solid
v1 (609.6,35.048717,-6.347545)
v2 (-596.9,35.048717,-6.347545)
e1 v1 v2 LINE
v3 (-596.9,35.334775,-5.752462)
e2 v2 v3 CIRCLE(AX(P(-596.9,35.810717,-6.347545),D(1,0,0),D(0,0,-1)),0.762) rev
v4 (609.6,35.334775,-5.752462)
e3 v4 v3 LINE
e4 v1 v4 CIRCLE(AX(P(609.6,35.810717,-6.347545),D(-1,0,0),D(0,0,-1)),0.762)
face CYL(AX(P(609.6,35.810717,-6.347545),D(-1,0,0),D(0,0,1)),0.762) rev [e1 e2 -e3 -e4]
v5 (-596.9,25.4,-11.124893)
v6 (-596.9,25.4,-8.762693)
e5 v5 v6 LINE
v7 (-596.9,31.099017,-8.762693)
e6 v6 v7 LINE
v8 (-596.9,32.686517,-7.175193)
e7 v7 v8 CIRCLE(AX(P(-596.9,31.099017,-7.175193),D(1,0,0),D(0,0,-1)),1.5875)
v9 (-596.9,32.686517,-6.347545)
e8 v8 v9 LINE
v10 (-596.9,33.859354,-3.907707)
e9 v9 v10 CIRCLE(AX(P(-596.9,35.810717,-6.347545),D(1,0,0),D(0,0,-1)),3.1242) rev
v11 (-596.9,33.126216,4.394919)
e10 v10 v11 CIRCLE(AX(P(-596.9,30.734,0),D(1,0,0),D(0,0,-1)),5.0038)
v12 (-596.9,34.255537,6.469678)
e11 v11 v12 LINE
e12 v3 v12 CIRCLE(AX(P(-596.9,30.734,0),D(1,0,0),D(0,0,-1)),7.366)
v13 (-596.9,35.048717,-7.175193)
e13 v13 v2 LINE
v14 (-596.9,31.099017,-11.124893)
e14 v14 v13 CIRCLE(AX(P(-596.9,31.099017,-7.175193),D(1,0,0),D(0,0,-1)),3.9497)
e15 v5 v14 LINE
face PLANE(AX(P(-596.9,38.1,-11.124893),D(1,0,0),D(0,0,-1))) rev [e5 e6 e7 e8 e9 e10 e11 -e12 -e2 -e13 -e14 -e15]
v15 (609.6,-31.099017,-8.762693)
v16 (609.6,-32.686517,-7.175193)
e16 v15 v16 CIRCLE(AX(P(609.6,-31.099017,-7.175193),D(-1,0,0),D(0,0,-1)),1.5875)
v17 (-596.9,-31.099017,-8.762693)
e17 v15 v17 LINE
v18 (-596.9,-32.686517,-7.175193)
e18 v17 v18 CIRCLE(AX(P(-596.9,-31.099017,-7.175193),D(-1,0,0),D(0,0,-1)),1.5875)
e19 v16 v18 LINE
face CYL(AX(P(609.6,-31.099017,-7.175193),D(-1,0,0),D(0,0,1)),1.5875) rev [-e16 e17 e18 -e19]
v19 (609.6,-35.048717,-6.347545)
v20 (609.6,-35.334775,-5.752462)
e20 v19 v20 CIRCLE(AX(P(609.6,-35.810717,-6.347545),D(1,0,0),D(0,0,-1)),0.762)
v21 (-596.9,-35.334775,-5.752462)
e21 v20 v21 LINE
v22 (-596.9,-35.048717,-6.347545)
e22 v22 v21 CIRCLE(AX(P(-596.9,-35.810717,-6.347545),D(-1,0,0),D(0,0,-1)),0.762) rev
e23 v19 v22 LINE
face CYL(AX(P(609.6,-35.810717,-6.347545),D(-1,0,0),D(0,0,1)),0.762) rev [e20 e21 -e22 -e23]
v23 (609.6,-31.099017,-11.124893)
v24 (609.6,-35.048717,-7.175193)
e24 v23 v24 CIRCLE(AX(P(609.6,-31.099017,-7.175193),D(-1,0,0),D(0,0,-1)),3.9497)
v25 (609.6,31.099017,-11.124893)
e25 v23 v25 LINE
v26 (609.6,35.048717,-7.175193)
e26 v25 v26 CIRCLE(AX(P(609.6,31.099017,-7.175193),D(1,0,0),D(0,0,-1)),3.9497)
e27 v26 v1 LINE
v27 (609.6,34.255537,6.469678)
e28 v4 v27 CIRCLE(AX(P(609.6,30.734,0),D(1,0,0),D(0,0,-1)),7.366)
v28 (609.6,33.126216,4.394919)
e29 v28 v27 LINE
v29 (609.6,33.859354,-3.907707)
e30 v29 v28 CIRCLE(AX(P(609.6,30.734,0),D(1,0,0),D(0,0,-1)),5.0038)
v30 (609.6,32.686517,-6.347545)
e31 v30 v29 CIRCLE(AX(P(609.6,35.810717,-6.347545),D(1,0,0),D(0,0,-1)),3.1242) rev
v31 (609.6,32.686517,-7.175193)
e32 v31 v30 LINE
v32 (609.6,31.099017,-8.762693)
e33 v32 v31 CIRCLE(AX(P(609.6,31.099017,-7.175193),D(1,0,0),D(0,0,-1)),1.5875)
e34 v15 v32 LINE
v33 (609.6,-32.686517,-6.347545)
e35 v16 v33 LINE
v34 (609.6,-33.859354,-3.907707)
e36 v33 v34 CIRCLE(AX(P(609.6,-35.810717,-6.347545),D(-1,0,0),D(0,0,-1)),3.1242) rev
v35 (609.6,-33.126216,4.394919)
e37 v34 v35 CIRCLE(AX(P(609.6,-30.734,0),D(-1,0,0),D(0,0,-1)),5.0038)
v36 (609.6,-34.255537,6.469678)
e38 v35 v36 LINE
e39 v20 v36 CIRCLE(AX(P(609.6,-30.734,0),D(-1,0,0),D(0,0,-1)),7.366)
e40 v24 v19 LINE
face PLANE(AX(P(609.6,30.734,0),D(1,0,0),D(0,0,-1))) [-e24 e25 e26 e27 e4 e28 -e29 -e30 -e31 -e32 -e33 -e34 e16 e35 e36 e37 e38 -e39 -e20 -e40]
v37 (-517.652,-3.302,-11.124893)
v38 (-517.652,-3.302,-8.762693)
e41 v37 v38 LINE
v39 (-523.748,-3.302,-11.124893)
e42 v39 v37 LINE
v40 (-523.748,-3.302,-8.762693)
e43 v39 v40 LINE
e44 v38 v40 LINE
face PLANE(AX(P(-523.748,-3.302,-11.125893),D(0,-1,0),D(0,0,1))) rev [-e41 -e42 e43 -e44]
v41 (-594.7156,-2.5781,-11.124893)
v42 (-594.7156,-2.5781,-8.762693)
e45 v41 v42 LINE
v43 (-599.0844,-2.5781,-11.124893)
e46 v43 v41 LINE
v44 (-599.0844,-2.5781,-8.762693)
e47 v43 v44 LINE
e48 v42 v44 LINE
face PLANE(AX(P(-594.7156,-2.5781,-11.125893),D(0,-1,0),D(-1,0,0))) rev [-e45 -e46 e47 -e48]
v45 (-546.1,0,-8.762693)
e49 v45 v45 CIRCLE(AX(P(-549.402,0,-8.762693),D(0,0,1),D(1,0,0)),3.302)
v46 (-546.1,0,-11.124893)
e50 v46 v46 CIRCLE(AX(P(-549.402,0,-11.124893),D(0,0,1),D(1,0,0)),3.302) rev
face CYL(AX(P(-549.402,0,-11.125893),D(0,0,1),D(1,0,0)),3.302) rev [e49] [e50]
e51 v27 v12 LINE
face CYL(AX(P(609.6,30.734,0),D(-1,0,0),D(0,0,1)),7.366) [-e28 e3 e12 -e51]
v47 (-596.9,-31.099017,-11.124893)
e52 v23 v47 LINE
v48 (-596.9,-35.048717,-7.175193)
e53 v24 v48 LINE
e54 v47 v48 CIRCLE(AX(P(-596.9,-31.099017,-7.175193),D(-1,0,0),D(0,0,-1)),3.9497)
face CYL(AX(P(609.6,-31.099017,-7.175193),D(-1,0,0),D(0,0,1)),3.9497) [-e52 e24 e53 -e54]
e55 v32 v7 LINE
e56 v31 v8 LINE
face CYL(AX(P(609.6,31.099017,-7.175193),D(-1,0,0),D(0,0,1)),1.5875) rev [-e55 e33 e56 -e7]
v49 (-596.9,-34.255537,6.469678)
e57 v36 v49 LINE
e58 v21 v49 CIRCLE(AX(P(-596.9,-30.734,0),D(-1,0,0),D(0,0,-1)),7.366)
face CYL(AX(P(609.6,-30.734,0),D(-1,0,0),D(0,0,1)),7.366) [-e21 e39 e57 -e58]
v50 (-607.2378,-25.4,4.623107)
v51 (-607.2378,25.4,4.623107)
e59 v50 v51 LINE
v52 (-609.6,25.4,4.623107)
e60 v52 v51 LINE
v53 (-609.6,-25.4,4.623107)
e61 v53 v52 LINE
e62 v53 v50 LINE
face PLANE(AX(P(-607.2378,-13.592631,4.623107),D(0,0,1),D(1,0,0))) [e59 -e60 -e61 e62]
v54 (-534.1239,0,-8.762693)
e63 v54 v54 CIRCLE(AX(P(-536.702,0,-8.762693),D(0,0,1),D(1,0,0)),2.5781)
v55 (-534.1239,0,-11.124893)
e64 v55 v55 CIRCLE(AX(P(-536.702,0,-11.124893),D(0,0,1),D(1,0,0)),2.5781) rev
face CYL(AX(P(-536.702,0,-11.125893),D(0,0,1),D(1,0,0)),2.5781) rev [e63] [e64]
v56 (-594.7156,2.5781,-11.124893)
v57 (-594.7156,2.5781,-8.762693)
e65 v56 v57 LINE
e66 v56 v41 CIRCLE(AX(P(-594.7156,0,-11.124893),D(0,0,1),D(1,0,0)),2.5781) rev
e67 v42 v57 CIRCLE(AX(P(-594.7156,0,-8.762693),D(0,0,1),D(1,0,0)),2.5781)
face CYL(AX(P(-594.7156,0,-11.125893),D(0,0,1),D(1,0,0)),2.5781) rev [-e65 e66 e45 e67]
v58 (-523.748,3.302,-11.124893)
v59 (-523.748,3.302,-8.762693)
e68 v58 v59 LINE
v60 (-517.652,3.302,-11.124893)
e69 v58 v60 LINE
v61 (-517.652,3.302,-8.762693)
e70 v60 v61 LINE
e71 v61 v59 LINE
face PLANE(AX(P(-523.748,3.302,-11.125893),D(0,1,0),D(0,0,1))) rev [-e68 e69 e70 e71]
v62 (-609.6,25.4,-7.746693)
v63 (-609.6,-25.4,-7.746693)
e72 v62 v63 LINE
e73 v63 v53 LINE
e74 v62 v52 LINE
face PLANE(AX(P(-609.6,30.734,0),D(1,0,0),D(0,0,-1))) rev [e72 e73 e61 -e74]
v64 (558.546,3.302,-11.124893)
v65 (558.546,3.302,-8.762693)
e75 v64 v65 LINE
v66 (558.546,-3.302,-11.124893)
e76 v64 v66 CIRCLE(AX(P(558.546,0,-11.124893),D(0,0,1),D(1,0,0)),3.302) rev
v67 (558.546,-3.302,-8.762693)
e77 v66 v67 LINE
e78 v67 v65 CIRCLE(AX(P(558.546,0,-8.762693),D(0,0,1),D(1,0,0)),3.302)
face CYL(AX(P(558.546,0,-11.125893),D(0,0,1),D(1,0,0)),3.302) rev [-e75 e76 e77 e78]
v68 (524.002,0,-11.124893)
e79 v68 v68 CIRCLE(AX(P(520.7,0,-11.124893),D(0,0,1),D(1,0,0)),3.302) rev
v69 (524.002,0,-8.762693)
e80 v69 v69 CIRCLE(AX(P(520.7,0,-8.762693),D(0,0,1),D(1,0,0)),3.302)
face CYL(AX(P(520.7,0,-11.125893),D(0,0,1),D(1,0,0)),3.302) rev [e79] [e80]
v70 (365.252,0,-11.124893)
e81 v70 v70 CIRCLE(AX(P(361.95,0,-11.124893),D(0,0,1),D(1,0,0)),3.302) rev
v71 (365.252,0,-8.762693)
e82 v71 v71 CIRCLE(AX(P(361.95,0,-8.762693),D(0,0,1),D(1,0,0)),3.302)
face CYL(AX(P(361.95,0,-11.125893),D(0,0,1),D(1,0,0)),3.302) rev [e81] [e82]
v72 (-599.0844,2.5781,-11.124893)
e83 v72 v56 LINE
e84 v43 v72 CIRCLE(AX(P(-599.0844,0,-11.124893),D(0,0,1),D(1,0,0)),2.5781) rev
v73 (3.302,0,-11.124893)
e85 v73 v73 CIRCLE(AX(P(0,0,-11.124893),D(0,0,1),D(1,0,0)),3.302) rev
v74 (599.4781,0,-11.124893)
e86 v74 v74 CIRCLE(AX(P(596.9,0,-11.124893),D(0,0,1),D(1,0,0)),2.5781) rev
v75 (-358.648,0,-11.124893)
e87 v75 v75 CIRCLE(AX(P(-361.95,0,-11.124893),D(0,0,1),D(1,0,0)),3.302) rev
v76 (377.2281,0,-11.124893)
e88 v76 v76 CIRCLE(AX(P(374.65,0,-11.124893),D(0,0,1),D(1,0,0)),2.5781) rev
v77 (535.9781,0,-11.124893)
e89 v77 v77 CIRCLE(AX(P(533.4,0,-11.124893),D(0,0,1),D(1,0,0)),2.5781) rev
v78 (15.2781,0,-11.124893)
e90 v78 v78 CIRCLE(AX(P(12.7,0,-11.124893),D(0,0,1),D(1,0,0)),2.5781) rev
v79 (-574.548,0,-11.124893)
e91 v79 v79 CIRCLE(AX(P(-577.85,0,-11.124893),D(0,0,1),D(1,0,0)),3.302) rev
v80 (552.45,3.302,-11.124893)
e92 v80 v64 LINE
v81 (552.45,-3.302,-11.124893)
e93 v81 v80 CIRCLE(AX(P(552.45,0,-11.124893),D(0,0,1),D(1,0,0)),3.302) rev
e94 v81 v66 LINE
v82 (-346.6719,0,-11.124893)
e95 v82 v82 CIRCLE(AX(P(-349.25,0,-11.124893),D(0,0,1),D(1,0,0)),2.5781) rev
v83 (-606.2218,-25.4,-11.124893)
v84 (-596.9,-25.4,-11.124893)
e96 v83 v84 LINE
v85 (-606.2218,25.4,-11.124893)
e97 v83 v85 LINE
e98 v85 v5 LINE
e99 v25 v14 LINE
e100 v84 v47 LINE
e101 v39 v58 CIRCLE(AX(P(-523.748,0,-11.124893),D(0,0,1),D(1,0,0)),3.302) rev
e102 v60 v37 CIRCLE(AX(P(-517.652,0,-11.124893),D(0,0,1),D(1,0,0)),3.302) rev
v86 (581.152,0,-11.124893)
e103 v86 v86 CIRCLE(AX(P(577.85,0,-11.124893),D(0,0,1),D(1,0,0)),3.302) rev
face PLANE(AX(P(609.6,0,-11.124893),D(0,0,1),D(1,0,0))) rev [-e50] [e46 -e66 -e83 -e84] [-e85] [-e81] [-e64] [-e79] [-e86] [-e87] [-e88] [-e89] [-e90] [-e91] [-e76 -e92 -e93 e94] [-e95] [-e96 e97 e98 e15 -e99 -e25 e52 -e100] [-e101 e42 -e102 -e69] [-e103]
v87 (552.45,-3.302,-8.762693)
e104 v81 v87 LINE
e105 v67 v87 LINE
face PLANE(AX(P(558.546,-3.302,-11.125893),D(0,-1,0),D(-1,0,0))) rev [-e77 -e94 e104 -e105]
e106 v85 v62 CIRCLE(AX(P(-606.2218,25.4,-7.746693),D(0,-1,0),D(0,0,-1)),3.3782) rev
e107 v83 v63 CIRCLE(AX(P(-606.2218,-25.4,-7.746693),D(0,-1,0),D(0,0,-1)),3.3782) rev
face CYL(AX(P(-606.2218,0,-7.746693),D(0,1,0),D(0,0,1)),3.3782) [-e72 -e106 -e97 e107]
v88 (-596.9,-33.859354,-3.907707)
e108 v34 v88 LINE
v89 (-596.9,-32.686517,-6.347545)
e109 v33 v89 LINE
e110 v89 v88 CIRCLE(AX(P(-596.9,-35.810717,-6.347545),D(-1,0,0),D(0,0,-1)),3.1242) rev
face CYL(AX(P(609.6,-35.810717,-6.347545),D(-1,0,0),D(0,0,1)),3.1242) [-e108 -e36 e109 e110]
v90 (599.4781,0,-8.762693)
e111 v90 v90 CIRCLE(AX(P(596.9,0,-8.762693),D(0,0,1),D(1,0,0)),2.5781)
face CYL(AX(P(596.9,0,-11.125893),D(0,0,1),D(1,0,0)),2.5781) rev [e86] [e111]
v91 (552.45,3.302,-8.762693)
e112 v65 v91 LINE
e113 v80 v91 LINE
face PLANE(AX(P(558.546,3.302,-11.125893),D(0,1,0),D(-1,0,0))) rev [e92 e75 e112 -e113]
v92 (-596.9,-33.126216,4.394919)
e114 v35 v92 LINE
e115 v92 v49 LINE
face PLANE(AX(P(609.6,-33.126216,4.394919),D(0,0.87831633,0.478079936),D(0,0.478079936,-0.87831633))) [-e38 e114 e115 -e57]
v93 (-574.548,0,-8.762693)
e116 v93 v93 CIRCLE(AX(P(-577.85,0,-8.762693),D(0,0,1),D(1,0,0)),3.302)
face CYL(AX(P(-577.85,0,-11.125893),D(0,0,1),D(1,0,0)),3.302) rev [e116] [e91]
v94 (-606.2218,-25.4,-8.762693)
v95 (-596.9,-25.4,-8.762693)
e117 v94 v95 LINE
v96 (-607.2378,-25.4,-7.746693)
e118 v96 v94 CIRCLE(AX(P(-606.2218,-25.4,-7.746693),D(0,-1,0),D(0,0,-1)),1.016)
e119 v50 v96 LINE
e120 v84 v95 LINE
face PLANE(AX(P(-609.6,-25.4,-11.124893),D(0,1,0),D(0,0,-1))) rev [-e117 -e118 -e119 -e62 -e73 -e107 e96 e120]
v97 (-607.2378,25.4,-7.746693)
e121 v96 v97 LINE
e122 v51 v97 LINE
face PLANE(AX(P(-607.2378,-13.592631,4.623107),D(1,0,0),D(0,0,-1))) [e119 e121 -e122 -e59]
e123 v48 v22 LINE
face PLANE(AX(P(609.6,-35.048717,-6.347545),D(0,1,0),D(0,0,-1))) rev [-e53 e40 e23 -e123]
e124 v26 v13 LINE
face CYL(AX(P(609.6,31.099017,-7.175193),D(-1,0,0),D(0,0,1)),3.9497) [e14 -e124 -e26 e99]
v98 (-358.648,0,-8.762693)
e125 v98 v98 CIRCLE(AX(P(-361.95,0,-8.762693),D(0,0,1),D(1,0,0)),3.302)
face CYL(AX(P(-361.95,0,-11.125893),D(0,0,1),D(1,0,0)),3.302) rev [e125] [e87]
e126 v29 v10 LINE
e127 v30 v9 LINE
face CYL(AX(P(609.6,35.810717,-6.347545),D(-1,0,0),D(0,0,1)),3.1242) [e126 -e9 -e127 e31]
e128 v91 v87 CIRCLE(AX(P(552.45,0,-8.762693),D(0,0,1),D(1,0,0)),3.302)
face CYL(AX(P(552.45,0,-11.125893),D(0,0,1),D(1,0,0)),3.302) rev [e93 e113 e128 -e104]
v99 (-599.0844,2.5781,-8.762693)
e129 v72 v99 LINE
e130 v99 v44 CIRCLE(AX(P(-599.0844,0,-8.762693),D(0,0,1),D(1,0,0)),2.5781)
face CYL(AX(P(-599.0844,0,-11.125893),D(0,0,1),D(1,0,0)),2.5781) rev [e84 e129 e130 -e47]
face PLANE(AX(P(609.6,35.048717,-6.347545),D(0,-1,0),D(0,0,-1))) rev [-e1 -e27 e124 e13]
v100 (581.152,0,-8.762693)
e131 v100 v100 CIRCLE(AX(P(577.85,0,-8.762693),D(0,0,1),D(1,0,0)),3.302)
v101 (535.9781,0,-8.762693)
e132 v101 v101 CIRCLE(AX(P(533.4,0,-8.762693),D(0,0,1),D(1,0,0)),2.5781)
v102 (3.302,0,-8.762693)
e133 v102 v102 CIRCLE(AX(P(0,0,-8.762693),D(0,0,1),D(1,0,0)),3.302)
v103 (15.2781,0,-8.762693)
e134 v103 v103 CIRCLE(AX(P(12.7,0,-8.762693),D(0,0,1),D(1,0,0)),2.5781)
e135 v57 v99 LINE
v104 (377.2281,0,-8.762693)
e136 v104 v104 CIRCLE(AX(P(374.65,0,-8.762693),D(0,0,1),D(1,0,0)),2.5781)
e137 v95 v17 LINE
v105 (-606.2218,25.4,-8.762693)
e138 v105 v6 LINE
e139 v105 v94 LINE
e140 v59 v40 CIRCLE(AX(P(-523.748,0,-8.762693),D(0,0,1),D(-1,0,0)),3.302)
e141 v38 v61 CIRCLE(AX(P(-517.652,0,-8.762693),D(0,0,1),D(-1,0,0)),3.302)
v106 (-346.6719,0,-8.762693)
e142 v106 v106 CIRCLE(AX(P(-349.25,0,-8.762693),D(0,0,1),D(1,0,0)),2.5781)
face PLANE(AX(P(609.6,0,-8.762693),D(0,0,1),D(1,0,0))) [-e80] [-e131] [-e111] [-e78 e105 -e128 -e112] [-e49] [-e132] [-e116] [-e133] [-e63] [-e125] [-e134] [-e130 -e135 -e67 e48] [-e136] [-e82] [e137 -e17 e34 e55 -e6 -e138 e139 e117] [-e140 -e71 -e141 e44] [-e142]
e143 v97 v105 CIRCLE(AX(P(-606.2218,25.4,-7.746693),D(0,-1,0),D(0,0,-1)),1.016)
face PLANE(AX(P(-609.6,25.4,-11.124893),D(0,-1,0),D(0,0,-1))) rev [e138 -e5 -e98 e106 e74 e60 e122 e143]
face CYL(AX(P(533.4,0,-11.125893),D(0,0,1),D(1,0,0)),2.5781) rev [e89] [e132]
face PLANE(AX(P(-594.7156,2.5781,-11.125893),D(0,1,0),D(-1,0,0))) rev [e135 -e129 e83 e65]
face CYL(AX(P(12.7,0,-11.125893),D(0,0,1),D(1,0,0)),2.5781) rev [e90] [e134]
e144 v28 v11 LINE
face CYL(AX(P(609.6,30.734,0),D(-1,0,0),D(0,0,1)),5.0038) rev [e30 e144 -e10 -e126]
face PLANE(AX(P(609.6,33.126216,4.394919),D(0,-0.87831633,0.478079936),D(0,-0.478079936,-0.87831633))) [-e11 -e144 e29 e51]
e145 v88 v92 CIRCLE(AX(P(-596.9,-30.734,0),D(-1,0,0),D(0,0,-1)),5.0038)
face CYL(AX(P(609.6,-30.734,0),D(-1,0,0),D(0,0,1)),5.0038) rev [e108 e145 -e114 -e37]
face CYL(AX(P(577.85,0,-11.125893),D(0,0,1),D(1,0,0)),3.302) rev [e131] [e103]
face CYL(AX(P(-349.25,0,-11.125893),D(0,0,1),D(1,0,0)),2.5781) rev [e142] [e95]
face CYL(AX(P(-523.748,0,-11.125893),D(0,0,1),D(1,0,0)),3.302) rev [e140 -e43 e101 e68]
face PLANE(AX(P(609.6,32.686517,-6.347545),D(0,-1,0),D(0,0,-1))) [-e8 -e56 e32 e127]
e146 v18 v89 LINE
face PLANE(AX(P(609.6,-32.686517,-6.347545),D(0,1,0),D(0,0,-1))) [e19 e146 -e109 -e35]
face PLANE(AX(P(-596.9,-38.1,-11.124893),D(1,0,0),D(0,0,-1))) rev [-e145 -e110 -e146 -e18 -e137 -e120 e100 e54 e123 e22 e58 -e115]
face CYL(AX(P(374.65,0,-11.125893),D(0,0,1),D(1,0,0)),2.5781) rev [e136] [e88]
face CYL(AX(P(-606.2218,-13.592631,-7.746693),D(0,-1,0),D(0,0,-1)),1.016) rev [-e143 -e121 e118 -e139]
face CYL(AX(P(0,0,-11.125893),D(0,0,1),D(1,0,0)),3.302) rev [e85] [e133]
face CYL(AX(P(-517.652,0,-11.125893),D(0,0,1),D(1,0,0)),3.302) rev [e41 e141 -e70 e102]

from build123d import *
from build123d.topology import SkipClean

# Parameters (mm, degrees)
EXTRUDE_THIN1_START     = -609.6
EXTRUDE_THIN1_DEPTH     = 1219.2
EXTRUDE_THIN2_DEPTH     = 1212.85
EXTRUDE_THIN5_START     = -1216.66
EXTRUDE_THIN5_DEPTH     = 1216.66
CUT_EXTRUDE1_DEPTH      = 1830.230661576
CUT_EXTRUDE1_DEPTH_BACK = 1830.230661576
SKETCH6_W               = 12.7
SKETCH6_H               = 12.7
SKETCH9_W               = 2.3622
SKETCH9_H               = 13.3858
EXTRUDE1_DEPTH          = 25.4
FILLET1_R               = 1.016
FILLET2_R               = 3.3782
CUT_EXTRUDE2_DEPTH      = 2.3622
SKETCH2_R               = 2.5781
SKETCH2_R_2             = 3.302
CUT_EXTRUDE12_DEPTH     = 2.3622
SKETCH22_R              = 2.5781
SKETCH22_R_2            = 3.302
SKETCH22_R_3            = 3.5687
CUT_EXTRUDE13_DEPTH     = 2.3622
SKETCH23_R              = 2.5781
SKETCH23_R_2            = 3.302
CUT_EXTRUDE14_DEPTH     = 2.3622
SKETCH24_R              = 2.5781
SKETCH24_R_2            = 3.302
CUT_EXTRUDE15_DEPTH     = 2.3622
SKETCH25_R              = 2.5781
SKETCH25_R_2            = 3.302
CUT_EXTRUDE16_DEPTH     = 2.3622
SKETCH27_R              = 3.5687
CUT_E_DEPTH             = 2.3622
SKETCH28_R              = 3.302
CUT_F_DEPTH             = 2.3622
SKETCH29_R              = 2.5781
CUT_EXTRUDE18_DEPTH     = 2.3622
CUT_H_DEPTH             = 2.3622
CUT_J_DEPTH             = 2.3622
SKETCH32_R              = 2.5781
SKETCH32_R_2            = 3.302
CUT_EXTRUDE21_DEPTH     = 2.3622
SKETCH210_R             = 2.5781
SKETCH210_R_2           = 3.302
CUT_EXTRUDE19_DEPTH     = 2.3622
SKETCH211_R             = 2.5781
SKETCH211_R_2           = 3.302
CUT_EXTRUDE110_DEPTH    = 2.3622
SKETCH212_R             = 2.5781
SKETCH212_R_2           = 3.302
CUT_EXTRUDE111_DEPTH    = 2.3622
SKETCH214_R             = 2.5781
SKETCH214_R_2           = 3.302
CUT_EXTRUDE113_DEPTH    = 2.3622
SKETCH215_R             = 3.302
CUT_EXTRUDE114_DEPTH    = 2.3622
CUT_R_DEPTH             = 2.3622
LPATTERN1_COUNT         = 23
LPATTERN1_PITCH         = 25.4
EXTRUDE2_DEPTH          = 12.7
EXTRUDE2_DEPTH_BACK     = 565.15
SKETCH218_W             = 11.43
SKETCH218_H             = 1.27
LPATTERN2_COUNT         = 23
LPATTERN2_PITCH         = 25.4
EXTRUDE3_DEPTH          = 12.7
EXTRUDE3_DEPTH_BACK     = 568.96
SKETCH220_W             = 9.245599771
SKETCH220_H             = 1.27


# Read off the part's stored shape, not the designer's step: Extrude-Thin1, Extrude-Thin5
with BuildPart() as part:
    # Extrude-Thin1 outline → Extrude-Thin1 (new body)
    with BuildSketch(Plane(origin=(0, 0, 0), x_dir=(0, 0, -1), z_dir=(1, 0, 0)).offset(EXTRUDE_THIN1_START)):
        with BuildLine():
            ThreePointArc((5.752462483, 35.334775085), (-0.647910774, 38.071449668), (-6.469678085, 34.255536805))
            Line((-6.469678085, 34.255536805), (-4.394919251, 33.126216382))
            ThreePointArc((-4.394919251, 33.126216382), (-0.440132491, 35.718405464), (3.907707273, 33.85935411))
            ThreePointArc((3.907707273, 33.85935411), (4.993998236, 32.994951487), (6.347544809, 32.686517335))
            Line((6.347544809, 32.686517335), (7.175193262, 32.686517335))
            ThreePointArc((7.175193262, 32.686517335), (8.297725277, 32.22154935), (8.762693262, 31.099017335))
            Line((8.762693262, 31.099017335), (8.762693262, 0))
            Line((8.762693262, 0), (11.124893262, 0))
            Line((11.124893262, 0), (11.124893262, 31.099017335))
            ThreePointArc((11.124893262, 31.099017335), (9.968052916, 33.891876989), (7.175193262, 35.048717335))
            Line((7.175193262, 35.048717335), (6.347544809, 35.048717335))
            ThreePointArc((6.347544809, 35.048717335), (6.017411498, 35.123945177), (5.752462483, 35.334775085))
        make_face()
    extrude(amount=EXTRUDE_THIN1_DEPTH)

    # Sketch6 → Cut-Extrude1 (cut, two sides: drawn at the far end of the back side and taken through both)
    with BuildSketch(Plane.XY.offset(-CUT_EXTRUDE1_DEPTH_BACK)):
        with Locations((-603.25, 31.75)):
            Rectangle(SKETCH6_W, SKETCH6_H)
    extrude(amount=CUT_EXTRUDE1_DEPTH + CUT_EXTRUDE1_DEPTH_BACK, mode=Mode.SUBTRACT)

    # Sketch9 → Extrude1 (add)
    with BuildSketch(Plane(origin=(0, 25.4, 0), x_dir=(-1, 0, 0), z_dir=(0, 1, 0))):
        with Locations((608.4189, -2.069793262)):
            Rectangle(SKETCH9_W, SKETCH9_H)
    extrude(amount=-EXTRUDE1_DEPTH)

    # Fillet1
    fillet1_edges = [part.edges().sort_by_distance(p)[0] for p in [
        (-607.2378, 12.7, -8.762693262),
    ]]
    fillet(fillet1_edges, radius=FILLET1_R)

    # Fillet2
    fillet2_edges = [part.edges().sort_by_distance(p)[0] for p in [
        (-609.6, 12.7, -11.124893262),
    ]]
    fillet(fillet2_edges, radius=FILLET2_R)

    # Sketch32 → Cut-Extrude21 (cut)
    with BuildSketch(Plane.XY.offset(-8.762693262)):
        with Locations((596.9, 0)):
            Circle(SKETCH32_R)
        with Locations((577.85, 0)):
            Circle(SKETCH32_R_2)
        with Locations((520.7, 0)):
            Circle(SKETCH32_R_2)
        with Locations((533.4, 0)):
            Circle(SKETCH32_R)
        with BuildLine():
            Line((549.148, 0), (561.848, 0))
            ThreePointArc((561.848, 0), (560.880866591, 2.334866591), (558.546, 3.302))
            Line((558.546, 3.302), (552.45, 3.302))
            ThreePointArc((552.45, 3.302), (550.115133409, 2.334866591), (549.148, 0))
        make_face()
    extrude(amount=-CUT_EXTRUDE21_DEPTH, mode=Mode.SUBTRACT)

    # Sketch210 → Cut-Extrude19 (cut)
    with BuildSketch(Plane(origin=(-677.249248887, 14.903736783, -8.762693262), x_dir=(1, 0, 0), z_dir=(0, 0, 1))):
        with Locations((1051.899248887, -14.903736783)):
            Circle(SKETCH210_R)
        with Locations((1039.199248887, -14.903736783)):
            Circle(SKETCH210_R_2)
    extrude(amount=-CUT_EXTRUDE19_DEPTH, mode=Mode.SUBTRACT)

    # Sketch211 → Cut-Extrude110 (cut)
    with BuildSketch(Plane(origin=(-447.985498291, 15.81613418, -8.762693262), x_dir=(1, 0, 0), z_dir=(0, 0, 1))):
        with Locations((460.685498291, -15.81613418)):
            Circle(SKETCH211_R)
        with Locations((447.985498291, -15.81613418)):
            Circle(SKETCH211_R_2)
    extrude(amount=-CUT_EXTRUDE110_DEPTH, mode=Mode.SUBTRACT)

    # Sketch212 → Cut-Extrude111 (cut)
    with BuildSketch(Plane(origin=(250.194594693, 14.477181682, -8.762693262), x_dir=(1, 0, 0), z_dir=(0, 0, 1))):
        with Locations((-599.444594693, -14.477181682)):
            Circle(SKETCH212_R)
        with Locations((-612.144594693, -14.477181682)):
            Circle(SKETCH212_R_2)
    extrude(amount=-CUT_EXTRUDE111_DEPTH, mode=Mode.SUBTRACT)

    # Sketch214 → Cut-Extrude113 (cut)
    with BuildSketch(Plane(origin=(529.798432462, 18.139402612, -8.762693262), x_dir=(1, 0, 0), z_dir=(0, 0, 1))):
        with Locations((-1066.500432462, -18.139402612)):
            Circle(SKETCH214_R)
        with Locations((-1079.200432462, -18.139402612)):
            Circle(SKETCH214_R_2)
        with BuildLine():
            Line((-1044.148432462, -18.139402612), (-1056.848432462, -18.139402612))
            ThreePointArc((-1056.848432462, -18.139402612), (-1055.881299054, -15.80453602), (-1053.546432462, -14.837402612))
            Line((-1053.546432462, -14.837402612), (-1047.450432462, -14.837402612))
            ThreePointArc((-1047.450432462, -14.837402612), (-1045.115565871, -15.80453602), (-1044.148432462, -18.139402612))
        make_face()
    extrude(amount=-CUT_EXTRUDE113_DEPTH, mode=Mode.SUBTRACT)

    # Sketch215 → Cut-Extrude114 (cut)
    with BuildSketch(Plane(origin=(674.3557152, 11.320285871, -8.762693262), x_dir=(1, 0, 0), z_dir=(0, 0, 1))):
        with Locations((-1252.2057152, -11.320285871)):
            Circle(SKETCH215_R)
    extrude(amount=-CUT_EXTRUDE114_DEPTH, mode=Mode.SUBTRACT)

    # Sketch216 → Cut R (cut)
    with BuildSketch(Plane.XY.offset(-8.762693262)):
        with BuildLine():
            Line((-601.6625, 0), (-592.1375, 0))
            ThreePointArc((-592.1375, 0), (-592.892608007, 1.822991993), (-594.7156, 2.5781))
            Line((-594.7156, 2.5781), (-599.0844, 2.5781))
            ThreePointArc((-599.0844, 2.5781), (-600.907391993, 1.822991993), (-601.6625, 0))
        make_face()
    extrude(amount=-CUT_R_DEPTH, mode=Mode.SUBTRACT)

    # Mirror1 3: part across plane


with BuildPart() as body_2:
    # Sketch4 → Extrude-Thin2 (new body)
    with BuildSketch(Plane(origin=(1219.2, 0, 0), x_dir=(0, 0, -1), z_dir=(1, 0, 0))):
        with BuildLine():
            ThreePointArc((3.54024831, 19.789205828), (0.77024158, 21.457292879), (-2.36668079, 20.672965307))
            ThreePointArc((-2.36668079, 20.672965307), (-3.091811244, 20.294053258), (-3.898522237, 20.157649845))
            ThreePointArc((-3.898522237, 20.157649845), (-5.766174756, 20.914093138), (-6.542172842, 22.773705828))
            Line((-6.542172842, 22.773705828), (-6.542172842, 25.161305828))
            ThreePointArc((-6.542172842, 25.161305828), (-5.766174756, 27.020918518), (-3.898522237, 27.77736181))
            ThreePointArc((-3.898522237, 27.77736181), (-3.659975019, 27.729624759), (-3.455361804, 27.598030559))
            ThreePointArc((-3.455361804, 27.598030559), (-0.023095262, 26.226172038), (3.414460302, 27.584723163))
            ThreePointArc((3.414460302, 27.584723163), (6.244879756, 28.080225918), (7.822893148, 25.678836527))
            Line((7.822893148, 25.678836527), (7.822893148, 11.408756936))
            ThreePointArc((7.822893148, 11.408756936), (7.431553352, 9.948256936), (6.362393148, 8.879096732))
            Line((6.362393148, 8.879096732), (3.123893148, 7.009347885))
            ThreePointArc((3.123893148, 7.009347885), (2.84498179, 6.730436527), (2.742893148, 6.349436527))
            Line((2.742893148, 6.349436527), (2.742893148, 0))
            Line((2.742893148, 0), (0.583893148, 0))
            Line((0.583893148, 0), (0.583893148, 6.349436527))
            ThreePointArc((0.583893148, 6.349436527), (0.975232943, 7.809936527), (2.044393148, 8.879096732))
            Line((2.044393148, 8.879096732), (5.282893148, 10.748845578))
            ThreePointArc((5.282893148, 10.748845578), (5.561804505, 11.027756936), (5.663893148, 11.408756936))
            Line((5.663893148, 11.408756936), (5.663893148, 25.678836527))
            ThreePointArc((5.663893148, 25.678836527), (5.388123817, 26.098496809), (4.893487408, 26.011904095))
            ThreePointArc((4.893487408, 26.011904095), (0.412345154, 24.079826794), (-4.266408016, 25.466487303))
            ThreePointArc((-4.266408016, 25.466487303), (-4.352985021, 25.324684037), (-4.383172842, 25.161305828))
            Line((-4.383172842, 25.161305828), (-4.383172842, 22.773705828))
            ThreePointArc((-4.383172842, 22.773705828), (-4.247561526, 22.448724969), (-3.921175649, 22.316530996))
            ThreePointArc((-3.921175649, 22.316530996), (-3.780197029, 22.340368486), (-3.653475202, 22.406586125))
            ThreePointArc((-3.653475202, 22.406586125), (1.089702598, 23.592527212), (5.278086268, 21.070299201))
            Line((5.278086268, 21.070299201), (3.54024831, 19.789205828))
        make_face()
    extrude(amount=-EXTRUDE_THIN2_DEPTH)

    # Mirror1: body 2 across plane


with BuildPart() as body_3:
    # Extrude-Thin5 outline → Extrude-Thin5 (new body)
    with BuildSketch(Plane(origin=(1828.8, 0, 0), x_dir=(0, 0, -1), z_dir=(1, 0, 0)).offset(EXTRUDE_THIN5_START)):
        with BuildLine():
            Line((-7.925106738, 0), (-5.562906738, 0))
            Line((-5.562906738, 0), (-5.562906738, 13.036209579))
            ThreePointArc((-5.562906738, 13.036209579), (-5.437890097, 13.255022954), (-5.185904431, 13.258440163))
            Line((-5.185904431, 13.258440163), (-2.932066495, 12.010964405))
            ThreePointArc((-2.932066495, 12.010964405), (1.369676528, 11.28348431), (5.180595526, 13.407423274))
            Line((5.180595526, 13.407423274), (3.41147618, 14.972736527))
            ThreePointArc((3.41147618, 14.972736527), (0.968956668, 13.611447462), (-1.788145038, 14.077708835))
            Line((-1.788145038, 14.077708835), (-4.041982973, 15.325184593))
            ThreePointArc((-4.041982973, 15.325184593), (-6.637435339, 15.28998734), (-7.925106738, 13.036209579))
            Line((-7.925106738, 13.036209579), (-7.925106738, 0))
        make_face()
    extrude(amount=EXTRUDE_THIN5_DEPTH)

    # Sketch10 → Cut-Extrude2 (cut)
    with BuildSketch(Plane.XY.offset(7.925106738)):
        with BuildLine():
            Line((1805.07005, 0), (1823.35805, 0))
            ThreePointArc((1823.35805, 0), (1814.21405, 9.144), (1805.07005, 0))
        make_face()
        with BuildLine():
            Line((1799.6281, 0), (1794.4719, 0))
            ThreePointArc((1794.4719, 0), (1797.05, 2.5781), (1799.6281, 0))
        make_face()
        with BuildLine():
            Line((1781.302, 0), (1774.698, 0))
            ThreePointArc((1774.698, 0), (1778, 3.302), (1781.302, 0))
        make_face()
        with BuildLine():
            Line((1762.252, 3.048), (1762.252, 0))
            Line((1762.252, 0), (1755.648, 0))
            Line((1755.648, 0), (1755.648, 3.048))
            ThreePointArc((1755.648, 3.048), (1758.95, 6.35), (1762.252, 3.048))
        make_face()
        with BuildLine():
            Line((1748.8281, 0), (1743.6719, 0))
            ThreePointArc((1743.6719, 0), (1746.25, 2.5781), (1748.8281, 0))
        make_face()
        with BuildLine():
            Line((1736.852, 0), (1730.248, 0))
            ThreePointArc((1730.248, 0), (1733.55, 3.302), (1736.852, 0))
        make_face()
    extrude(amount=-CUT_EXTRUDE2_DEPTH, mode=Mode.SUBTRACT)

    # Sketch2 → Cut-Extrude12 (cut)
    with BuildSketch(Plane(origin=(-2141.845428582, 6.157941778, 7.925106738), x_dir=(1, 0, 0), z_dir=(0, 0, 1))):
        with Locations((3824.595428582, -6.157941778)):
            Circle(SKETCH2_R)
        with Locations((3811.895428582, -6.157941778)):
            Circle(SKETCH2_R_2)
    extrude(amount=-CUT_EXTRUDE12_DEPTH, mode=Mode.SUBTRACT)

    # Sketch22 → Cut-Extrude13 (cut)
    with BuildSketch(Plane(origin=(-2143.135428603, 5.657950018, 7.925106738), x_dir=(1, 0, 0), z_dir=(0, 0, 1))):
        with Locations((3762.385428603, -5.657950018)):
            Circle(SKETCH22_R)
        with Locations((3730.635428603, -5.657950018)):
            Circle(SKETCH22_R_2)
        with Locations((3749.685428603, -5.657950018)):
            Circle(SKETCH22_R_3)
    extrude(amount=-CUT_EXTRUDE13_DEPTH, mode=Mode.SUBTRACT)

    # Sketch23 → Cut-Extrude14 (cut)
    with BuildSketch(Plane(origin=(-2022.429166167, 5.760053708, 7.925106738), x_dir=(1, 0, 0), z_dir=(0, 0, 1))):
        with Locations((3463.879166167, -5.760053708)):
            Circle(SKETCH23_R)
        with Locations((3451.179166167, -5.760053708)):
            Circle(SKETCH23_R_2)
    extrude(amount=-CUT_EXTRUDE14_DEPTH, mode=Mode.SUBTRACT)

    # Sketch24 → Cut-Extrude15 (cut)
    with BuildSketch(Plane(origin=(-1862.330020924, 7.905664942, 7.925106738), x_dir=(1, 0, 0), z_dir=(0, 0, 1))):
        with Locations((3151.380020924, -7.905664942)):
            Circle(SKETCH24_R)
        with Locations((3138.680020924, -7.905664942)):
            Circle(SKETCH24_R_2)
    extrude(amount=-CUT_EXTRUDE15_DEPTH, mode=Mode.SUBTRACT)

    # Sketch25 → Cut-Extrude16 (cut)
    with BuildSketch(Plane(origin=(-1718.369763818, 7.737387679, 7.925106738), x_dir=(1, 0, 0), z_dir=(0, 0, 1))):
        with Locations((2702.619763818, -7.737387679)):
            Circle(SKETCH25_R)
        with Locations((2689.919763818, -7.737387679)):
            Circle(SKETCH25_R_2)
    extrude(amount=-CUT_EXTRUDE16_DEPTH, mode=Mode.SUBTRACT)

    # Sketch27 → Cut E (cut)
    with BuildSketch(Plane.XY.offset(7.925106738)):
        with Locations((806.45, 0)):
            Circle(SKETCH27_R)
        with BuildLine():
            Line((796.8615, 0), (780.9865, 0))
            ThreePointArc((780.9865, 0), (781.953633409, 2.334866591), (784.2885, 3.302))
            Line((784.2885, 3.302), (793.5595, 3.302))
            ThreePointArc((793.5595, 3.302), (795.894366591, 2.334866591), (796.8615, 0))
        make_face()
    extrude(amount=-CUT_E_DEPTH, mode=Mode.SUBTRACT)

    # Sketch28 → Cut F (cut)
    with BuildSketch(Plane.XY.offset(7.925106738)):
        with Locations((728.726, 0)):
            Circle(SKETCH28_R)
    extrude(amount=-CUT_F_DEPTH, mode=Mode.SUBTRACT)

    # Sketch29 → Cut-Extrude18 (cut)
    with BuildSketch(Plane(origin=(-866.129297637, 5.417355799, 7.925106738), x_dir=(1, 0, 0), z_dir=(0, 0, 1))):
        with Locations((1582.155297637, -5.417355799)):
            Circle(SKETCH29_R)
        with BuildLine():
            Line((1574.217797637, -5.417355799), (1564.692797637, -5.417355799))
            ThreePointArc((1564.692797637, -5.417355799), (1565.659931046, -3.082489207), (1567.994797637, -2.115355799))
            Line((1567.994797637, -2.115355799), (1570.915797637, -2.115355799))
            ThreePointArc((1570.915797637, -2.115355799), (1573.250664228, -3.082489207), (1574.217797637, -5.417355799))
        make_face()
    extrude(amount=-CUT_EXTRUDE18_DEPTH, mode=Mode.SUBTRACT)

    # Sketch30 → Cut H (cut)
    with BuildSketch(Plane.XY.offset(7.925106738)):
        with BuildLine():
            Line((680.974, 0), (680.974, 3.048))
            ThreePointArc((680.974, 3.048), (684.276, 6.35), (687.578, 3.048))
            Line((687.578, 3.048), (687.578, 0))
            Line((687.578, 0), (680.974, 0))
        make_face()
    extrude(amount=-CUT_H_DEPTH, mode=Mode.SUBTRACT)

    # Sketch31 → Cut J (cut)
    with BuildSketch(Plane.XY.offset(7.925106738)):
        with BuildLine():
            Line((669.9885, 0), (660.4635, 0))
            ThreePointArc((660.4635, 0), (661.218608007, 1.822991993), (663.0416, 2.5781))
            Line((663.0416, 2.5781), (667.4104, 2.5781))
            ThreePointArc((667.4104, 2.5781), (669.233391993, 1.822991993), (669.9885, 0))
        make_face()
    extrude(amount=-CUT_J_DEPTH, mode=Mode.SUBTRACT)

    # Mirror1 2: body 3 across plane


with BuildPart() as body_2_1:
    add(body_2.part)
    add(body_2.part.mirror(Plane.ZX))


with BuildPart() as body_3_1:
    with SkipClean():  # the faces are left unmerged after this step: merging them gives an invalid solid
        add(body_3.part)
        add(body_3.part.mirror(Plane.ZX))


with BuildPart() as part_1:
    with SkipClean():  # the faces are left unmerged after this step: merging them gives an invalid solid
        add(part.part)
        add(part.part.mirror(Plane.ZX))


with BuildPart() as body_4:
    # Sketch217 → Revolve1 (revolve)
    with BuildSketch(Plane(origin=(584.2, 0, 0), x_dir=(0, 0, -1), z_dir=(1, 0, 0))):
        with BuildLine():
            Line((0, 35.7378), (0, 26.22652483))
            ThreePointArc((0, 26.22652483), (4.755637585, 30.982162415), (0, 35.7378))
        make_face()
    revolve(axis=Axis((584.2, 36.603094088, 0), (0, -1, 0)))


with BuildPart() as lpattern1_1:
    # LPattern1: pattern copy
    add(body_4.part.moved(Location(Vector(-1, 0, 0) * (1 * LPATTERN1_PITCH))))


with BuildPart() as lpattern1_2:
    # LPattern1: pattern copy
    add(body_4.part.moved(Location(Vector(-1, 0, 0) * (2 * LPATTERN1_PITCH))))


with BuildPart() as lpattern1_3:
    # LPattern1: pattern copy
    add(body_4.part.moved(Location(Vector(-1, 0, 0) * (3 * LPATTERN1_PITCH))))


with BuildPart() as lpattern1_4:
    # LPattern1: pattern copy
    add(body_4.part.moved(Location(Vector(-1, 0, 0) * (4 * LPATTERN1_PITCH))))


with BuildPart() as lpattern1_5:
    # LPattern1: pattern copy
    add(body_4.part.moved(Location(Vector(-1, 0, 0) * (5 * LPATTERN1_PITCH))))


with BuildPart() as lpattern1_6:
    # LPattern1: pattern copy
    add(body_4.part.moved(Location(Vector(-1, 0, 0) * (6 * LPATTERN1_PITCH))))


with BuildPart() as lpattern1_7:
    # LPattern1: pattern copy
    add(body_4.part.moved(Location(Vector(-1, 0, 0) * (7 * LPATTERN1_PITCH))))


with BuildPart() as lpattern1_8:
    # LPattern1: pattern copy
    add(body_4.part.moved(Location(Vector(-1, 0, 0) * (8 * LPATTERN1_PITCH))))


with BuildPart() as lpattern1_9:
    # LPattern1: pattern copy
    add(body_4.part.moved(Location(Vector(-1, 0, 0) * (9 * LPATTERN1_PITCH))))


with BuildPart() as lpattern1_10:
    # LPattern1: pattern copy
    add(body_4.part.moved(Location(Vector(-1, 0, 0) * (10 * LPATTERN1_PITCH))))


with BuildPart() as lpattern1_11:
    # LPattern1: pattern copy
    add(body_4.part.moved(Location(Vector(-1, 0, 0) * (11 * LPATTERN1_PITCH))))


with BuildPart() as lpattern1_12:
    # LPattern1: pattern copy
    add(body_4.part.moved(Location(Vector(-1, 0, 0) * (12 * LPATTERN1_PITCH))))


with BuildPart() as lpattern1_13:
    # LPattern1: pattern copy
    add(body_4.part.moved(Location(Vector(-1, 0, 0) * (13 * LPATTERN1_PITCH))))


with BuildPart() as lpattern1_14:
    # LPattern1: pattern copy
    add(body_4.part.moved(Location(Vector(-1, 0, 0) * (14 * LPATTERN1_PITCH))))


with BuildPart() as lpattern1_15:
    # LPattern1: pattern copy
    add(body_4.part.moved(Location(Vector(-1, 0, 0) * (15 * LPATTERN1_PITCH))))


with BuildPart() as lpattern1_16:
    # LPattern1: pattern copy
    add(body_4.part.moved(Location(Vector(-1, 0, 0) * (16 * LPATTERN1_PITCH))))


with BuildPart() as lpattern1_17:
    # LPattern1: pattern copy
    add(body_4.part.moved(Location(Vector(-1, 0, 0) * (17 * LPATTERN1_PITCH))))


with BuildPart() as lpattern1_18:
    # LPattern1: pattern copy
    add(body_4.part.moved(Location(Vector(-1, 0, 0) * (18 * LPATTERN1_PITCH))))


with BuildPart() as lpattern1_19:
    # LPattern1: pattern copy
    add(body_4.part.moved(Location(Vector(-1, 0, 0) * (19 * LPATTERN1_PITCH))))


with BuildPart() as lpattern1_20:
    # LPattern1: pattern copy
    add(body_4.part.moved(Location(Vector(-1, 0, 0) * (20 * LPATTERN1_PITCH))))


with BuildPart() as lpattern1_21:
    # LPattern1: pattern copy
    add(body_4.part.moved(Location(Vector(-1, 0, 0) * (21 * LPATTERN1_PITCH))))


with BuildPart() as lpattern1_22:
    # LPattern1: pattern copy
    add(body_4.part.moved(Location(Vector(-1, 0, 0) * (22 * LPATTERN1_PITCH))))


with BuildPart() as body_4_1:
    add(body_4.part)

    add(lpattern1_1.part)  # Extrude2 merges LPattern1_1

    add(lpattern1_2.part)  # Extrude2 merges LPattern1_2

    add(lpattern1_3.part)  # Extrude2 merges LPattern1_3

    add(lpattern1_4.part)  # Extrude2 merges LPattern1_4

    add(lpattern1_5.part)  # Extrude2 merges LPattern1_5

    add(lpattern1_6.part)  # Extrude2 merges LPattern1_6

    add(lpattern1_7.part)  # Extrude2 merges LPattern1_7

    add(lpattern1_8.part)  # Extrude2 merges LPattern1_8

    add(lpattern1_9.part)  # Extrude2 merges LPattern1_9

    add(lpattern1_10.part)  # Extrude2 merges LPattern1_10

    add(lpattern1_11.part)  # Extrude2 merges LPattern1_11

    add(lpattern1_12.part)  # Extrude2 merges LPattern1_12

    add(lpattern1_13.part)  # Extrude2 merges LPattern1_13

    add(lpattern1_14.part)  # Extrude2 merges LPattern1_14

    add(lpattern1_15.part)  # Extrude2 merges LPattern1_15

    add(lpattern1_16.part)  # Extrude2 merges LPattern1_16

    add(lpattern1_17.part)  # Extrude2 merges LPattern1_17

    add(lpattern1_18.part)  # Extrude2 merges LPattern1_18

    add(lpattern1_19.part)  # Extrude2 merges LPattern1_19

    add(lpattern1_20.part)  # Extrude2 merges LPattern1_20

    add(lpattern1_21.part)  # Extrude2 merges LPattern1_21

    add(lpattern1_22.part)  # Extrude2 merges LPattern1_22
    # Sketch218 → Extrude2 (add, two sides: drawn at the far end of the back side and taken through both)
    with BuildSketch(Plane(origin=(584.2, 0, 0), x_dir=(0, 0, -1), z_dir=(1, 0, 0)).offset(-EXTRUDE2_DEPTH_BACK)):
        with Locations((0, 30.9753)):
            Rectangle(SKETCH218_W, SKETCH218_H)
    extrude(amount=EXTRUDE2_DEPTH + EXTRUDE2_DEPTH_BACK)


with BuildPart() as body_5:
    # Sketch219 → Revolve2 (revolve)
    with BuildSketch(Plane(origin=(1193.8, 0, 0), x_dir=(0, 0, -1), z_dir=(1, 0, 0))):
        with BuildLine():
            Line((-0.000306852, 21.487836527), (-0.000306852, 13.550336527))
            ThreePointArc((-0.000306852, 13.550336527), (3.968443148, 17.519086527), (-0.000306852, 21.487836527))
        make_face()
    revolve(axis=Axis((1193.8, 22.284965157, 0.000306852), (0, -1, 0)))


with BuildPart() as lpattern2_1:
    # LPattern2: pattern copy
    add(body_5.part.moved(Location(Vector(-1, 0, 0) * (1 * LPATTERN2_PITCH))))


with BuildPart() as lpattern2_2:
    # LPattern2: pattern copy
    add(body_5.part.moved(Location(Vector(-1, 0, 0) * (2 * LPATTERN2_PITCH))))


with BuildPart() as lpattern2_3:
    # LPattern2: pattern copy
    add(body_5.part.moved(Location(Vector(-1, 0, 0) * (3 * LPATTERN2_PITCH))))


with BuildPart() as lpattern2_4:
    # LPattern2: pattern copy
    add(body_5.part.moved(Location(Vector(-1, 0, 0) * (4 * LPATTERN2_PITCH))))


with BuildPart() as lpattern2_5:
    # LPattern2: pattern copy
    add(body_5.part.moved(Location(Vector(-1, 0, 0) * (5 * LPATTERN2_PITCH))))


with BuildPart() as lpattern2_6:
    # LPattern2: pattern copy
    add(body_5.part.moved(Location(Vector(-1, 0, 0) * (6 * LPATTERN2_PITCH))))


with BuildPart() as lpattern2_7:
    # LPattern2: pattern copy
    add(body_5.part.moved(Location(Vector(-1, 0, 0) * (7 * LPATTERN2_PITCH))))


with BuildPart() as lpattern2_8:
    # LPattern2: pattern copy
    add(body_5.part.moved(Location(Vector(-1, 0, 0) * (8 * LPATTERN2_PITCH))))


with BuildPart() as lpattern2_9:
    # LPattern2: pattern copy
    add(body_5.part.moved(Location(Vector(-1, 0, 0) * (9 * LPATTERN2_PITCH))))


with BuildPart() as lpattern2_10:
    # LPattern2: pattern copy
    add(body_5.part.moved(Location(Vector(-1, 0, 0) * (10 * LPATTERN2_PITCH))))


with BuildPart() as lpattern2_11:
    # LPattern2: pattern copy
    add(body_5.part.moved(Location(Vector(-1, 0, 0) * (11 * LPATTERN2_PITCH))))


with BuildPart() as lpattern2_12:
    # LPattern2: pattern copy
    add(body_5.part.moved(Location(Vector(-1, 0, 0) * (12 * LPATTERN2_PITCH))))


with BuildPart() as lpattern2_13:
    # LPattern2: pattern copy
    add(body_5.part.moved(Location(Vector(-1, 0, 0) * (13 * LPATTERN2_PITCH))))


with BuildPart() as lpattern2_14:
    # LPattern2: pattern copy
    add(body_5.part.moved(Location(Vector(-1, 0, 0) * (14 * LPATTERN2_PITCH))))


with BuildPart() as lpattern2_15:
    # LPattern2: pattern copy
    add(body_5.part.moved(Location(Vector(-1, 0, 0) * (15 * LPATTERN2_PITCH))))


with BuildPart() as lpattern2_16:
    # LPattern2: pattern copy
    add(body_5.part.moved(Location(Vector(-1, 0, 0) * (16 * LPATTERN2_PITCH))))


with BuildPart() as lpattern2_17:
    # LPattern2: pattern copy
    add(body_5.part.moved(Location(Vector(-1, 0, 0) * (17 * LPATTERN2_PITCH))))


with BuildPart() as lpattern2_18:
    # LPattern2: pattern copy
    add(body_5.part.moved(Location(Vector(-1, 0, 0) * (18 * LPATTERN2_PITCH))))


with BuildPart() as lpattern2_19:
    # LPattern2: pattern copy
    add(body_5.part.moved(Location(Vector(-1, 0, 0) * (19 * LPATTERN2_PITCH))))


with BuildPart() as lpattern2_20:
    # LPattern2: pattern copy
    add(body_5.part.moved(Location(Vector(-1, 0, 0) * (20 * LPATTERN2_PITCH))))


with BuildPart() as lpattern2_21:
    # LPattern2: pattern copy
    add(body_5.part.moved(Location(Vector(-1, 0, 0) * (21 * LPATTERN2_PITCH))))


with BuildPart() as lpattern2_22:
    # LPattern2: pattern copy
    add(body_5.part.moved(Location(Vector(-1, 0, 0) * (22 * LPATTERN2_PITCH))))


with BuildPart() as body_5_1:
    add(body_5.part)

    add(lpattern2_1.part)  # Extrude3 merges LPattern2_1

    add(lpattern2_2.part)  # Extrude3 merges LPattern2_2

    add(lpattern2_3.part)  # Extrude3 merges LPattern2_3

    add(lpattern2_4.part)  # Extrude3 merges LPattern2_4

    add(lpattern2_5.part)  # Extrude3 merges LPattern2_5

    add(lpattern2_6.part)  # Extrude3 merges LPattern2_6

    add(lpattern2_7.part)  # Extrude3 merges LPattern2_7

    add(lpattern2_8.part)  # Extrude3 merges LPattern2_8

    add(lpattern2_9.part)  # Extrude3 merges LPattern2_9

    add(lpattern2_10.part)  # Extrude3 merges LPattern2_10

    add(lpattern2_11.part)  # Extrude3 merges LPattern2_11

    add(lpattern2_12.part)  # Extrude3 merges LPattern2_12

    add(lpattern2_13.part)  # Extrude3 merges LPattern2_13

    add(lpattern2_14.part)  # Extrude3 merges LPattern2_14

    add(lpattern2_15.part)  # Extrude3 merges LPattern2_15

    add(lpattern2_16.part)  # Extrude3 merges LPattern2_16

    add(lpattern2_17.part)  # Extrude3 merges LPattern2_17

    add(lpattern2_18.part)  # Extrude3 merges LPattern2_18

    add(lpattern2_19.part)  # Extrude3 merges LPattern2_19

    add(lpattern2_20.part)  # Extrude3 merges LPattern2_20

    add(lpattern2_21.part)  # Extrude3 merges LPattern2_21

    add(lpattern2_22.part)  # Extrude3 merges LPattern2_22
    # Sketch220 → Extrude3 (add, two sides: drawn at the far end of the back side and taken through both)
    with BuildSketch(Plane(origin=(1193.8, 0, 0), x_dir=(0, 0, -1), z_dir=(1, 0, 0)).offset(-EXTRUDE3_DEPTH_BACK)):
        with Locations((-0.000306853, 17.519086527)):
            Rectangle(SKETCH220_W, SKETCH220_H)
    extrude(amount=EXTRUDE3_DEPTH + EXTRUDE3_DEPTH_BACK)


with BuildPart() as body_6:
    # Mirror3: mirrored copy
    add(body_4_1.part.mirror(Plane.ZX))


with BuildPart() as body_7:
    # Mirror3 2: mirrored copy
    add(body_5_1.part.mirror(Plane.ZX))


solid = part_1.part
